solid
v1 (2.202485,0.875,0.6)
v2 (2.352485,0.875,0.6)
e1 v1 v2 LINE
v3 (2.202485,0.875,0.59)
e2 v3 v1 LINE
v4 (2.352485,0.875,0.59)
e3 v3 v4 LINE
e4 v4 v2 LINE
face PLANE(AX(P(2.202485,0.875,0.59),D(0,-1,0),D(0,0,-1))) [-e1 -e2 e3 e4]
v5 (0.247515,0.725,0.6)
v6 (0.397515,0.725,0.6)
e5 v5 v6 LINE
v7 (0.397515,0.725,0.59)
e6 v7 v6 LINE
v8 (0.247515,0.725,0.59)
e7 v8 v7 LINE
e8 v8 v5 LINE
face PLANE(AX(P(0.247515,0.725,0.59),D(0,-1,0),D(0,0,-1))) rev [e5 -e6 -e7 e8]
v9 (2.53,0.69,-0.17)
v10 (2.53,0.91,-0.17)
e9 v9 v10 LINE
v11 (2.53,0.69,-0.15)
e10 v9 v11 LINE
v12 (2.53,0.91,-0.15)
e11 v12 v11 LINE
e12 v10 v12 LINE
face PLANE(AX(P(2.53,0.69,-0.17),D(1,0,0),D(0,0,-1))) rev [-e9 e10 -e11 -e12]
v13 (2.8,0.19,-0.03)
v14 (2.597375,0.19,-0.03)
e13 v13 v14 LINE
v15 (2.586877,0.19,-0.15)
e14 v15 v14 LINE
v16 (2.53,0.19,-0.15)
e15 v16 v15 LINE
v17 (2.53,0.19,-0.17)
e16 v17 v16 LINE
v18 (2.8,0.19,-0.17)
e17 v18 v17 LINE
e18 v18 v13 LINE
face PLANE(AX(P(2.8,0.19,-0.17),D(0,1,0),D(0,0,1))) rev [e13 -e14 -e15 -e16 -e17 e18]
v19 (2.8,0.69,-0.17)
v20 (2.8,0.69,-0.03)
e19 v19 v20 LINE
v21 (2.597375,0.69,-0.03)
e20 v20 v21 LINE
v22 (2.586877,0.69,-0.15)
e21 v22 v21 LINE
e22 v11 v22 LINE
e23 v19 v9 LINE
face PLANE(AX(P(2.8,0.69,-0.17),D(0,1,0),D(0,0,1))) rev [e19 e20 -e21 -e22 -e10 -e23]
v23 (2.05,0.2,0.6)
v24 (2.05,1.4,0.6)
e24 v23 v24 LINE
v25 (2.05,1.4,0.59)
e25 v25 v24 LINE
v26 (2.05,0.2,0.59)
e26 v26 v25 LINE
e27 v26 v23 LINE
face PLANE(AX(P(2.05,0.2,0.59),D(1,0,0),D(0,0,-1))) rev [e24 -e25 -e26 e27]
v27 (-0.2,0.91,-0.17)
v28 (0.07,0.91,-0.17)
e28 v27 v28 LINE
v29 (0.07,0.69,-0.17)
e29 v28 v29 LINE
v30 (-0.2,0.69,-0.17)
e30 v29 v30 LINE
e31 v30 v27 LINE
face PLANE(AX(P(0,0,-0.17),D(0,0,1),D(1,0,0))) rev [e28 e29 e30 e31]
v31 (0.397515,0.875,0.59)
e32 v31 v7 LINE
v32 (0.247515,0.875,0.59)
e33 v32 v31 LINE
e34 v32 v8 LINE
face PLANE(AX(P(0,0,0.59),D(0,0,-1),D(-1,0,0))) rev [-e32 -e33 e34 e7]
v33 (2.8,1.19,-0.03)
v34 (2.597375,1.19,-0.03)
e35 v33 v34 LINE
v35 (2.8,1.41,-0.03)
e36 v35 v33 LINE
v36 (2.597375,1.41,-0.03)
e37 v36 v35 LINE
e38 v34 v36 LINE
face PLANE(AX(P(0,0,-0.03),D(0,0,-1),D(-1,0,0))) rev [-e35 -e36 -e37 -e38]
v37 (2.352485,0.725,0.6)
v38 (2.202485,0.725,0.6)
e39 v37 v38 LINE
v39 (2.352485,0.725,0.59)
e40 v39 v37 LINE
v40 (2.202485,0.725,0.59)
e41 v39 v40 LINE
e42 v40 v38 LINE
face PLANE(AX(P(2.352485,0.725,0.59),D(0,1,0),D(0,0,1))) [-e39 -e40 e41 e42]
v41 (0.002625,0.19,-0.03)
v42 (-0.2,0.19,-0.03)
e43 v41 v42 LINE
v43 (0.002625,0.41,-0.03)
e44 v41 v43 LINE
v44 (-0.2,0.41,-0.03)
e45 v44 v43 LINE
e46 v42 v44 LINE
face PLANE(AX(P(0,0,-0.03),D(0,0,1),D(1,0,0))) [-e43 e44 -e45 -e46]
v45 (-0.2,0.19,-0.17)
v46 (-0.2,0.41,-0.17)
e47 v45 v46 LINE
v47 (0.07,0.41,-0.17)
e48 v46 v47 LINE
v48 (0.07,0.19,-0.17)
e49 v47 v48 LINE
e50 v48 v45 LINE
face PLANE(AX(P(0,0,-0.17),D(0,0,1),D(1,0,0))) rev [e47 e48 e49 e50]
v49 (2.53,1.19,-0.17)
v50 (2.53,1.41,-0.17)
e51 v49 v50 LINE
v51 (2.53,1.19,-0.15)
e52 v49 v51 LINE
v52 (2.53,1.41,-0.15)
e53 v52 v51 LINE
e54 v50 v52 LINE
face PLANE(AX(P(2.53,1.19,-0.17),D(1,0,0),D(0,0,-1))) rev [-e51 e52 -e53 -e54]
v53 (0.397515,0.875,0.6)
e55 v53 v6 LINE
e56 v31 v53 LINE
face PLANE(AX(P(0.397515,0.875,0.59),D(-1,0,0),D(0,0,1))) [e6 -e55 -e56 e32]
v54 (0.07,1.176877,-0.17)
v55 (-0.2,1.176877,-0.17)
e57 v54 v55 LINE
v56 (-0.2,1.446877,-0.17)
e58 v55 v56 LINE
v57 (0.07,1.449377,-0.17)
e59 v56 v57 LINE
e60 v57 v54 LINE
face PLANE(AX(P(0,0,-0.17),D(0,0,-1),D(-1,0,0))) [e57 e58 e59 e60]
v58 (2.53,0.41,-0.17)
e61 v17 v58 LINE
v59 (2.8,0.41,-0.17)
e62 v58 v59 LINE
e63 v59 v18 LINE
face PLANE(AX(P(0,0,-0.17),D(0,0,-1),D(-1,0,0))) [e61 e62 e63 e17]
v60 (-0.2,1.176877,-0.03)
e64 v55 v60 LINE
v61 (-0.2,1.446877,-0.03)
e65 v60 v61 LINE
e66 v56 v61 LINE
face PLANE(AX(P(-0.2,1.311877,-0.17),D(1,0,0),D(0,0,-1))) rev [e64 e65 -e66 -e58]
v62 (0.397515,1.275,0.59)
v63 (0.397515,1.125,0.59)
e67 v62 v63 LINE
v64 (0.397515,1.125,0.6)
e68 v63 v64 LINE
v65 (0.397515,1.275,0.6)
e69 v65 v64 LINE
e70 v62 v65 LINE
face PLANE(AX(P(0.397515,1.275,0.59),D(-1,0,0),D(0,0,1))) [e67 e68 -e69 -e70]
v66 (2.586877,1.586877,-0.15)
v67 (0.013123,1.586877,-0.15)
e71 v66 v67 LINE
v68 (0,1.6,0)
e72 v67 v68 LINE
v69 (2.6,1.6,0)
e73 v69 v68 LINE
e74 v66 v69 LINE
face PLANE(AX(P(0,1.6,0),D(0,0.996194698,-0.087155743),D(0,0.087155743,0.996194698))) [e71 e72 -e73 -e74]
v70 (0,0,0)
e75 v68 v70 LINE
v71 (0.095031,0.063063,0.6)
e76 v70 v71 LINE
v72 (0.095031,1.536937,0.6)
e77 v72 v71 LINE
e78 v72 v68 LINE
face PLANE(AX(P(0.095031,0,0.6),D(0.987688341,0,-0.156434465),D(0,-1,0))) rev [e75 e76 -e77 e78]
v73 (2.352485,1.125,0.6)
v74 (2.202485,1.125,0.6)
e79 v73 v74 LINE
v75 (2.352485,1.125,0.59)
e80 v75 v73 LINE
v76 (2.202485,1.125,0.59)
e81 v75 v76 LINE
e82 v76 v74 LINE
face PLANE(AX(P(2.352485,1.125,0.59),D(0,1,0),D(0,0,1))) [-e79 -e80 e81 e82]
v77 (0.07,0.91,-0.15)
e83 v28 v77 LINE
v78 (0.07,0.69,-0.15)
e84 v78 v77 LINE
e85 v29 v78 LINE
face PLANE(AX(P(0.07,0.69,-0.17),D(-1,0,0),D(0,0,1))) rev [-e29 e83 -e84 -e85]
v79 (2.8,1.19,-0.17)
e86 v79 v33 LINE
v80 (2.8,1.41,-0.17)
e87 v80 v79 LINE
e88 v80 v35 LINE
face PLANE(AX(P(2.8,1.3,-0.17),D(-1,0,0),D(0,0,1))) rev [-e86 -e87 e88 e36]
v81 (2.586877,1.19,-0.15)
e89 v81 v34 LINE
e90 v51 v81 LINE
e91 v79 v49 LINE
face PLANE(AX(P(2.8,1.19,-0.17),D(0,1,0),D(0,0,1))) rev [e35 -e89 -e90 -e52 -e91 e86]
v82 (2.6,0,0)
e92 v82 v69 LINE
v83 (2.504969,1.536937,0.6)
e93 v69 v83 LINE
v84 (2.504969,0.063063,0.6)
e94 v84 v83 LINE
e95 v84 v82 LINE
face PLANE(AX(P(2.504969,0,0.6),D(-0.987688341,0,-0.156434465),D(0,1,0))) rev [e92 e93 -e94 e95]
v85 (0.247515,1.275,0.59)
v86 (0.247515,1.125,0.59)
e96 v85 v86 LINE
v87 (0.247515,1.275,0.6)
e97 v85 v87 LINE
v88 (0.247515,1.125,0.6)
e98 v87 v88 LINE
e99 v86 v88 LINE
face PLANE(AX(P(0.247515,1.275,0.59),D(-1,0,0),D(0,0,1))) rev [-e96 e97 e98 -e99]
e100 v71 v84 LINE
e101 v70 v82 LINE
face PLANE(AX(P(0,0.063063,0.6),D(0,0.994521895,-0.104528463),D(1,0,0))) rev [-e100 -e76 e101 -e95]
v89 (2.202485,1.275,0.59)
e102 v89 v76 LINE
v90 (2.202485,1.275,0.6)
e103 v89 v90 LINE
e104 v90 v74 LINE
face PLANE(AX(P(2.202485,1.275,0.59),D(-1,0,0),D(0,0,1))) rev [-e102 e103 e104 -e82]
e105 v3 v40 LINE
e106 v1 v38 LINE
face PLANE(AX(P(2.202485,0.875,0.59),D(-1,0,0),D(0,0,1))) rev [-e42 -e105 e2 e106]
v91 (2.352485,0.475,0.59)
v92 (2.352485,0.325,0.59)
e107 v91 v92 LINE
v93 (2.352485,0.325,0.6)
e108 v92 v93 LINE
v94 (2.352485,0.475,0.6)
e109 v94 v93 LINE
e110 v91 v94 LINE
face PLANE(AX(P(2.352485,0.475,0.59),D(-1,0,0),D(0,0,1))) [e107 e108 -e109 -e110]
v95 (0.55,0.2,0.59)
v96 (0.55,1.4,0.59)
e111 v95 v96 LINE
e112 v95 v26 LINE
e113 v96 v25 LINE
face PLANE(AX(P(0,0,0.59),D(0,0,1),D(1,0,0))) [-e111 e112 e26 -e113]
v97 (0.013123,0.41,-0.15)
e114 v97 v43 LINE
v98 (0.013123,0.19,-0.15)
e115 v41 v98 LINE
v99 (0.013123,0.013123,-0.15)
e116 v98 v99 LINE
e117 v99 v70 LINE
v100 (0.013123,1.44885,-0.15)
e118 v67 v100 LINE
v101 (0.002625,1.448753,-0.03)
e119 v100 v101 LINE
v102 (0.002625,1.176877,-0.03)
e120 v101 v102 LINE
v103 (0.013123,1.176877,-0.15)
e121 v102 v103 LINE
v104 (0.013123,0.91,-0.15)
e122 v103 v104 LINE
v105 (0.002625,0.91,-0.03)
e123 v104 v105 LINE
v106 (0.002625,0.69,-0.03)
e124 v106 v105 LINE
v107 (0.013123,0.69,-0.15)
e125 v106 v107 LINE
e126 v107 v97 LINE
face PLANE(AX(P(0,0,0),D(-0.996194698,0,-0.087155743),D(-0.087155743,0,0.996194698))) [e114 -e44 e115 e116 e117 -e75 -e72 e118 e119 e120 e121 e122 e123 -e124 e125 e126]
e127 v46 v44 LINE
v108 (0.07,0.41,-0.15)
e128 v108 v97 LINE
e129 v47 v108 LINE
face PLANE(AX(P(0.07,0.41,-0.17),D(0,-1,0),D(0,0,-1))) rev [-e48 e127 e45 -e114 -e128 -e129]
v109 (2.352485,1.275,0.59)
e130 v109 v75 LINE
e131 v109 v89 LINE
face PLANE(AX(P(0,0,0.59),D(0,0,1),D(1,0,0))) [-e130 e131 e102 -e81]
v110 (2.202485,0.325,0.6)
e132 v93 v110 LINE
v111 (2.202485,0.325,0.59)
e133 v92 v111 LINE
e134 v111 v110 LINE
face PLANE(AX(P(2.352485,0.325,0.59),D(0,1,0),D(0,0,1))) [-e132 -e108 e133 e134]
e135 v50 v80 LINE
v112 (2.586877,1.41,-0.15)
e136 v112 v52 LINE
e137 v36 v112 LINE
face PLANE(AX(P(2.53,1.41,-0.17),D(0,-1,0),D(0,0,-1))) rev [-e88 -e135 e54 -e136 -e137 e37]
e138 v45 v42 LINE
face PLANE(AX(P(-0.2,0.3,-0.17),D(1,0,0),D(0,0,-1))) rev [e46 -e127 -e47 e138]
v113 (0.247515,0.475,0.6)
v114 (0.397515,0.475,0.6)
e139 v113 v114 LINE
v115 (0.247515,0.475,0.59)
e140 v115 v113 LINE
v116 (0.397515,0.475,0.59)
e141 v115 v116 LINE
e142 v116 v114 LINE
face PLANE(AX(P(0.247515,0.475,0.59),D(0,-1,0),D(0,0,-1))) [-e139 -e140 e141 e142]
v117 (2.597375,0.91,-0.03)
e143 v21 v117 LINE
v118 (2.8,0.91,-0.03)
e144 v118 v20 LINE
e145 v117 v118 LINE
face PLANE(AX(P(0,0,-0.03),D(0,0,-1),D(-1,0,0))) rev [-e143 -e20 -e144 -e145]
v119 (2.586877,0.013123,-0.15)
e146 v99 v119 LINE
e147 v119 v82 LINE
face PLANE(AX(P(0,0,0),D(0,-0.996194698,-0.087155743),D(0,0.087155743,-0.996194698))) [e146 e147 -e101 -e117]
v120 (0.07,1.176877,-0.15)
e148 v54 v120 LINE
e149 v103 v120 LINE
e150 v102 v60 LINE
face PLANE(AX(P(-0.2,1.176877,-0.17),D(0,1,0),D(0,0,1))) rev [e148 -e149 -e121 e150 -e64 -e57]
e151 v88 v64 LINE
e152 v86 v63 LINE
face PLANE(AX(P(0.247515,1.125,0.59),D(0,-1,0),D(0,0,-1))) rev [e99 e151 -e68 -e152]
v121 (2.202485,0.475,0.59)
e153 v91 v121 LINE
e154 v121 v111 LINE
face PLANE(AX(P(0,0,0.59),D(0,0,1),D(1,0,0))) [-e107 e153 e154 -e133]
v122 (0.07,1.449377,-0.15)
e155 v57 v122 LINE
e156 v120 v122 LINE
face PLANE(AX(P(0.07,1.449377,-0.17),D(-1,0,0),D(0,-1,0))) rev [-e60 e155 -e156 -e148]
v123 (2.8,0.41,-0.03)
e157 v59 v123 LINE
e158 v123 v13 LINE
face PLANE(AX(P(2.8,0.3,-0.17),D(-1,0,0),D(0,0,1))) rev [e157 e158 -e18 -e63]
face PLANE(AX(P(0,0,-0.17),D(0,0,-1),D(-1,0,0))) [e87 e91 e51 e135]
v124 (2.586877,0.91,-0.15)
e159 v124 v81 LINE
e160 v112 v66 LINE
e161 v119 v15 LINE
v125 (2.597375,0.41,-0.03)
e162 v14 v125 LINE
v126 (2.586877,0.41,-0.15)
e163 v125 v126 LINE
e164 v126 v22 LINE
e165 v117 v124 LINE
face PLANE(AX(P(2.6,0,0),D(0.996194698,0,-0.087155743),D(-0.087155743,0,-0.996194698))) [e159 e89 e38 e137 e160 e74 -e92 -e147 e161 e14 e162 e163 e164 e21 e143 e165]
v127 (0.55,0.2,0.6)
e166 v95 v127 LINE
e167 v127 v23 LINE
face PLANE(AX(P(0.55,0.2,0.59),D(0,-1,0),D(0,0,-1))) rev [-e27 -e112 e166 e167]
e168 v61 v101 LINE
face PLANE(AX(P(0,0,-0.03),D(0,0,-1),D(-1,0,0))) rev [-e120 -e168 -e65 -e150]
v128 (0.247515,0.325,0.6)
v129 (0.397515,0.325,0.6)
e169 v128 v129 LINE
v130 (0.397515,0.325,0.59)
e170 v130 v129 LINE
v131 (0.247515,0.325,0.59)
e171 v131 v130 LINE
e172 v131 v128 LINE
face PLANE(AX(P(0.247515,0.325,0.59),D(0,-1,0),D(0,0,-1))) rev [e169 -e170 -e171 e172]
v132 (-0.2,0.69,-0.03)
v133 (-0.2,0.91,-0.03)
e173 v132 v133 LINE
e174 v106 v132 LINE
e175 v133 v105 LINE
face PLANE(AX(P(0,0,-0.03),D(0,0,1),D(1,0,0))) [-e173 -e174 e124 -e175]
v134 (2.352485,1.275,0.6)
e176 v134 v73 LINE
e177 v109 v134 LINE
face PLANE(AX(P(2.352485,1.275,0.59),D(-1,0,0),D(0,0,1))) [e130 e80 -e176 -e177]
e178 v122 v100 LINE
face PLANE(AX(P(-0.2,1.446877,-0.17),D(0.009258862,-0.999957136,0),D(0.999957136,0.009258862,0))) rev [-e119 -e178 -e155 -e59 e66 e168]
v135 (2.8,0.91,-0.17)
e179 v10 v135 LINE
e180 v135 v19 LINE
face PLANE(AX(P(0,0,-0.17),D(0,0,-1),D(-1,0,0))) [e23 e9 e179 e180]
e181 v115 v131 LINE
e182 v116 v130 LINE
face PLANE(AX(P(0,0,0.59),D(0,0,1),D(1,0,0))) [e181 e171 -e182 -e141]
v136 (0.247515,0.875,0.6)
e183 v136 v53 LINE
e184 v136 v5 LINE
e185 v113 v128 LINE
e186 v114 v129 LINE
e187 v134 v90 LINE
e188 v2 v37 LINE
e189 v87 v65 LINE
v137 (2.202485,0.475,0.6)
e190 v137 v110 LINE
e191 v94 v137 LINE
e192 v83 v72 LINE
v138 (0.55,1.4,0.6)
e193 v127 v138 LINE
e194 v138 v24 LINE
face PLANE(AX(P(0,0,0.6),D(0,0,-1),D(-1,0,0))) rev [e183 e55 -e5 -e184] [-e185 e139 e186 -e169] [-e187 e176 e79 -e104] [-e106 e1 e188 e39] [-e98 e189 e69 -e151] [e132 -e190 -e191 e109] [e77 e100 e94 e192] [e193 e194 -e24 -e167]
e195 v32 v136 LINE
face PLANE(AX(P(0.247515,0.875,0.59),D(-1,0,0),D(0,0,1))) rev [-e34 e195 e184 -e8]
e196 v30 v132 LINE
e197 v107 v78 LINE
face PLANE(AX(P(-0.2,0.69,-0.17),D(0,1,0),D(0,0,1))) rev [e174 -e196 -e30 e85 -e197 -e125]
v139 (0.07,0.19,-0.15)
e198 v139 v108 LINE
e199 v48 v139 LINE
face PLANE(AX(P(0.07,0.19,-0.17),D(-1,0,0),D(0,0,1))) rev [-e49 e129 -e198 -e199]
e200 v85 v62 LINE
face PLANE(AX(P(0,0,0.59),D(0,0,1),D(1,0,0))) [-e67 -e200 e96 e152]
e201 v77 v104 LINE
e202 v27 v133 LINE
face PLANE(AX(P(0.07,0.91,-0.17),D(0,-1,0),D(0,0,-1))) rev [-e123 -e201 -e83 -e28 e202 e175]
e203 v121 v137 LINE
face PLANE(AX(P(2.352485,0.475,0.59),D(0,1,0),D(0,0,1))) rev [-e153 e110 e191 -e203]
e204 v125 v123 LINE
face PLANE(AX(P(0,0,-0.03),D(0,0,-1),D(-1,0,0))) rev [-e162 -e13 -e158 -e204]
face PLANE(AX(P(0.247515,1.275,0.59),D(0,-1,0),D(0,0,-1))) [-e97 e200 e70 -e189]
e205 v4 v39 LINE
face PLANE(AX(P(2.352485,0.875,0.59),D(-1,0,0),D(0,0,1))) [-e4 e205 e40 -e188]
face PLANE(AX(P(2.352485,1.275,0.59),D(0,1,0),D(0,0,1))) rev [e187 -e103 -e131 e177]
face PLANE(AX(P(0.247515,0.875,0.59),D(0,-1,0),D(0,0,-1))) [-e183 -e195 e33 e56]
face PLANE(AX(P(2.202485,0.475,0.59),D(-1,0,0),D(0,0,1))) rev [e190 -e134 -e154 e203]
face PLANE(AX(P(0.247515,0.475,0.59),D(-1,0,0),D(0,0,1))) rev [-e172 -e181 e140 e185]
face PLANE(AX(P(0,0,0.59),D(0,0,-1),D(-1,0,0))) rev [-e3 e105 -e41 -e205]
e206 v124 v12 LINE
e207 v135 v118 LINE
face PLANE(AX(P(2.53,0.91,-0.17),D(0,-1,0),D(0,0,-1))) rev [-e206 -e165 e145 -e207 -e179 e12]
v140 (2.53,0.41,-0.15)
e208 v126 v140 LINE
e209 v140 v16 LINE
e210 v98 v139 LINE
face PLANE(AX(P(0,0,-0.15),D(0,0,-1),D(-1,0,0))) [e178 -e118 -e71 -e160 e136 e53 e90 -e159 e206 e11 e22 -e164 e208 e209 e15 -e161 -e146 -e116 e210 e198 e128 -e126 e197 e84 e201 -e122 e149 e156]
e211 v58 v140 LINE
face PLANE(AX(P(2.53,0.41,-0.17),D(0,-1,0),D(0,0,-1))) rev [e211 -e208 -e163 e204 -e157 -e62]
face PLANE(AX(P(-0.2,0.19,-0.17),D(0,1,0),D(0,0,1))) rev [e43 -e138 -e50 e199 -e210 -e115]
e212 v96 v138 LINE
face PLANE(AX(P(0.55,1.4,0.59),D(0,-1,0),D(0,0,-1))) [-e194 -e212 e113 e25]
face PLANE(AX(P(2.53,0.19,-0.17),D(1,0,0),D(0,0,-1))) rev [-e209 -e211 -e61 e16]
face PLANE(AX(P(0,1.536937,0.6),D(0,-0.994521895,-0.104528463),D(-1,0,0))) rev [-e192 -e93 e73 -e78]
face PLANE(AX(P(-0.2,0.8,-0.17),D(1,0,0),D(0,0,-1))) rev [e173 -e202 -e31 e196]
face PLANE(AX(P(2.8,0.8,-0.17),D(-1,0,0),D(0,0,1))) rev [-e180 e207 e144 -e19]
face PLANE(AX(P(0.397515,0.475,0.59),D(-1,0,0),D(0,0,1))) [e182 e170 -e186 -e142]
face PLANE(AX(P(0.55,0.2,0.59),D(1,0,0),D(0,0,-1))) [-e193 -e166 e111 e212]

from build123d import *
from OCP.BRepFilletAPI import BRepFilletAPI_MakeChamfer

# Parameters (mm, degrees)
SKETCH_1_W                = 2.6
SKETCH_1_H                = 1.6
EXTRUDE_1_DEPTH           = 0.6
EXTRUDE_1_OTHER_WAY_DEPTH = 0.15
EXTRUDE_1_OTHER_WAY_TAPER = 5
CHAMFER_1_SIZE            = 0.6
CHAMFER_1_SIZE_2          = 0.095030664
CHAMFER_2_SIZE            = 0.6
CHAMFER_2_SIZE_2          = 0.063062541
EXTRUDE_2_DEPTH           = 0.02
EXTRUDE_2_DEPTH_BACK      = 0.12
SKETCH_5_W                = 0.15
SKETCH_5_H                = 0.15
SKETCH_5_W_2              = 1.5
SKETCH_5_H_2              = 1.2
CUT_EXTRUDE_1_DEPTH       = 0.01


# Some blends are built 0.0001 mm under size
with BuildPart() as part:
    # Эскиз1 → Бобышка-Вытянуть1 (new body)
    with BuildSketch(Plane.XY):
        with Locations((1.3, 0.8)):
            Rectangle(SKETCH_1_W, SKETCH_1_H)
    extrude(amount=EXTRUDE_1_DEPTH)

    # Эскиз1 → Бобышка-Вытянуть1 other way (add)
    with BuildSketch(Plane.XY):
        with Locations((1.3, 0.8)):
            Rectangle(SKETCH_1_W, SKETCH_1_H)
    extrude(amount=-EXTRUDE_1_OTHER_WAY_DEPTH, taper=EXTRUDE_1_OTHER_WAY_TAPER)

    # Фаска1
    # the kernel refuses this chamfer: 0.6, 0.095030664 mm, written as the material it takes off along each edge
    with BuildSketch(Plane(origin=(0, 3.15928955, 0.6), x_dir=(-0.006019451551713199, 0, -0.9999818829373943), z_dir=(0, -1, 0)), Plane(origin=(2.6, -1.55928955, 0.6), x_dir=(0.006019451551713157, 0, -0.9999818829373943), z_dir=(0, 1, 0))) as chamfer_1_piece_1:
        Polygon((CHAMFER_1_SIZE * 0.999981882937, CHAMFER_1_SIZE * 0.00601945155171), (-CHAMFER_1_SIZE_2 * 0.00601945156405, CHAMFER_1_SIZE_2 * 0.999981884986), (0, 0), align=None)
    extrude(amount=4.7185791, mode=Mode.SUBTRACT)

    # Фаска2
    chamfer_2_edges_1 = [part.edges().sort_by_distance(p)[0] for p in [
        (1.3, 0, 0.6),
    ]]
    chamfer_2_side_1 = [part.faces().sort_by_distance(p)[0] for p in [
        (1.3, 0, 0.598738749),
    ]]
    chamfer_2_edges_2 = [part.edges().sort_by_distance(p)[0] for p in [
        (1.3, 1.6, 0.6),
    ]]
    chamfer_2_side_2 = [part.faces().sort_by_distance(p)[0] for p in [
        (1.3, 1.598738749, 0.6),
    ]]
    chamfer_2 = BRepFilletAPI_MakeChamfer(part.part.solid().wrapped)
    for e in chamfer_2_edges_1:
        chamfer_2.Add(CHAMFER_2_SIZE - 0.0001, CHAMFER_2_SIZE_2 - 0.0001, e.wrapped, chamfer_2_side_1[0].wrapped)
    for e in chamfer_2_edges_2:
        chamfer_2.Add(CHAMFER_2_SIZE_2 - 0.0001, CHAMFER_2_SIZE - 0.0001, e.wrapped, chamfer_2_side_2[0].wrapped)
    add(Compound.cast(chamfer_2.Shape()), mode=Mode.REPLACE)  # a hair under: the kernel refuses the full size

    # Эскиз4 → Бобышка-Вытянуть2 (add, two sides: drawn at the far end of the back side and taken through both)
    with BuildSketch(Plane(origin=(0, 0, -0.15), x_dir=(-1, 0, 0), z_dir=(0, 0, -1)).offset(-EXTRUDE_2_DEPTH_BACK)):
        Polygon((-2.8, 0.8), (-2.8, 0.69), (-2.53, 0.69), (-2.53, 0.91), (-2.8, 0.91), align=None)
        Polygon((-0.07, 0.41), (0.2, 0.41), (0.2, 0.3), (0.2, 0.19), (-0.07, 0.19), align=None)
        Polygon((-2.8, 0.3), (-2.8, 0.19), (-2.53, 0.19), (-2.53, 0.41), (-2.8, 0.41), align=None)
        Polygon((-0.07, 0.91), (0.2, 0.91), (0.2, 0.8), (0.2, 0.69), (-0.07, 0.69), align=None)
        Polygon((-2.8, 1.3), (-2.8, 1.19), (-2.53, 1.19), (-2.53, 1.41), (-2.8, 1.41), align=None)
        Polygon((-0.07, 1.4493767), (-0.07, 1.1768767), (0.2, 1.1768767), (0.2, 1.3118767), (0.2, 1.4468767), align=None)
    extrude(amount=EXTRUDE_2_DEPTH + EXTRUDE_2_DEPTH_BACK)

    # Эскиз5 → Вырез-Вытянуть1 (cut)
    with BuildSketch(Plane.XY.offset(0.6)):
        with Locations((0.322515332, 1.2)):
            Rectangle(SKETCH_5_W, SKETCH_5_H)
        with Locations((2.277484668, 0.8)):
            Rectangle(SKETCH_5_W, SKETCH_5_H)
        with Locations((1.3, 0.8)):
            Rectangle(SKETCH_5_W_2, SKETCH_5_H_2)
        with Locations((0.322515332, 0.8)):
            Rectangle(SKETCH_5_W, SKETCH_5_H)
        with Locations((0.322515332, 0.4)):
            Rectangle(SKETCH_5_W, SKETCH_5_H)
        with Locations((2.277484668, 0.4)):
            Rectangle(SKETCH_5_W, SKETCH_5_H)
        with Locations((2.277484668, 1.2)):
            Rectangle(SKETCH_5_W, SKETCH_5_H)
    extrude(amount=-CUT_EXTRUDE_1_DEPTH, mode=Mode.SUBTRACT)


solid = part.part
